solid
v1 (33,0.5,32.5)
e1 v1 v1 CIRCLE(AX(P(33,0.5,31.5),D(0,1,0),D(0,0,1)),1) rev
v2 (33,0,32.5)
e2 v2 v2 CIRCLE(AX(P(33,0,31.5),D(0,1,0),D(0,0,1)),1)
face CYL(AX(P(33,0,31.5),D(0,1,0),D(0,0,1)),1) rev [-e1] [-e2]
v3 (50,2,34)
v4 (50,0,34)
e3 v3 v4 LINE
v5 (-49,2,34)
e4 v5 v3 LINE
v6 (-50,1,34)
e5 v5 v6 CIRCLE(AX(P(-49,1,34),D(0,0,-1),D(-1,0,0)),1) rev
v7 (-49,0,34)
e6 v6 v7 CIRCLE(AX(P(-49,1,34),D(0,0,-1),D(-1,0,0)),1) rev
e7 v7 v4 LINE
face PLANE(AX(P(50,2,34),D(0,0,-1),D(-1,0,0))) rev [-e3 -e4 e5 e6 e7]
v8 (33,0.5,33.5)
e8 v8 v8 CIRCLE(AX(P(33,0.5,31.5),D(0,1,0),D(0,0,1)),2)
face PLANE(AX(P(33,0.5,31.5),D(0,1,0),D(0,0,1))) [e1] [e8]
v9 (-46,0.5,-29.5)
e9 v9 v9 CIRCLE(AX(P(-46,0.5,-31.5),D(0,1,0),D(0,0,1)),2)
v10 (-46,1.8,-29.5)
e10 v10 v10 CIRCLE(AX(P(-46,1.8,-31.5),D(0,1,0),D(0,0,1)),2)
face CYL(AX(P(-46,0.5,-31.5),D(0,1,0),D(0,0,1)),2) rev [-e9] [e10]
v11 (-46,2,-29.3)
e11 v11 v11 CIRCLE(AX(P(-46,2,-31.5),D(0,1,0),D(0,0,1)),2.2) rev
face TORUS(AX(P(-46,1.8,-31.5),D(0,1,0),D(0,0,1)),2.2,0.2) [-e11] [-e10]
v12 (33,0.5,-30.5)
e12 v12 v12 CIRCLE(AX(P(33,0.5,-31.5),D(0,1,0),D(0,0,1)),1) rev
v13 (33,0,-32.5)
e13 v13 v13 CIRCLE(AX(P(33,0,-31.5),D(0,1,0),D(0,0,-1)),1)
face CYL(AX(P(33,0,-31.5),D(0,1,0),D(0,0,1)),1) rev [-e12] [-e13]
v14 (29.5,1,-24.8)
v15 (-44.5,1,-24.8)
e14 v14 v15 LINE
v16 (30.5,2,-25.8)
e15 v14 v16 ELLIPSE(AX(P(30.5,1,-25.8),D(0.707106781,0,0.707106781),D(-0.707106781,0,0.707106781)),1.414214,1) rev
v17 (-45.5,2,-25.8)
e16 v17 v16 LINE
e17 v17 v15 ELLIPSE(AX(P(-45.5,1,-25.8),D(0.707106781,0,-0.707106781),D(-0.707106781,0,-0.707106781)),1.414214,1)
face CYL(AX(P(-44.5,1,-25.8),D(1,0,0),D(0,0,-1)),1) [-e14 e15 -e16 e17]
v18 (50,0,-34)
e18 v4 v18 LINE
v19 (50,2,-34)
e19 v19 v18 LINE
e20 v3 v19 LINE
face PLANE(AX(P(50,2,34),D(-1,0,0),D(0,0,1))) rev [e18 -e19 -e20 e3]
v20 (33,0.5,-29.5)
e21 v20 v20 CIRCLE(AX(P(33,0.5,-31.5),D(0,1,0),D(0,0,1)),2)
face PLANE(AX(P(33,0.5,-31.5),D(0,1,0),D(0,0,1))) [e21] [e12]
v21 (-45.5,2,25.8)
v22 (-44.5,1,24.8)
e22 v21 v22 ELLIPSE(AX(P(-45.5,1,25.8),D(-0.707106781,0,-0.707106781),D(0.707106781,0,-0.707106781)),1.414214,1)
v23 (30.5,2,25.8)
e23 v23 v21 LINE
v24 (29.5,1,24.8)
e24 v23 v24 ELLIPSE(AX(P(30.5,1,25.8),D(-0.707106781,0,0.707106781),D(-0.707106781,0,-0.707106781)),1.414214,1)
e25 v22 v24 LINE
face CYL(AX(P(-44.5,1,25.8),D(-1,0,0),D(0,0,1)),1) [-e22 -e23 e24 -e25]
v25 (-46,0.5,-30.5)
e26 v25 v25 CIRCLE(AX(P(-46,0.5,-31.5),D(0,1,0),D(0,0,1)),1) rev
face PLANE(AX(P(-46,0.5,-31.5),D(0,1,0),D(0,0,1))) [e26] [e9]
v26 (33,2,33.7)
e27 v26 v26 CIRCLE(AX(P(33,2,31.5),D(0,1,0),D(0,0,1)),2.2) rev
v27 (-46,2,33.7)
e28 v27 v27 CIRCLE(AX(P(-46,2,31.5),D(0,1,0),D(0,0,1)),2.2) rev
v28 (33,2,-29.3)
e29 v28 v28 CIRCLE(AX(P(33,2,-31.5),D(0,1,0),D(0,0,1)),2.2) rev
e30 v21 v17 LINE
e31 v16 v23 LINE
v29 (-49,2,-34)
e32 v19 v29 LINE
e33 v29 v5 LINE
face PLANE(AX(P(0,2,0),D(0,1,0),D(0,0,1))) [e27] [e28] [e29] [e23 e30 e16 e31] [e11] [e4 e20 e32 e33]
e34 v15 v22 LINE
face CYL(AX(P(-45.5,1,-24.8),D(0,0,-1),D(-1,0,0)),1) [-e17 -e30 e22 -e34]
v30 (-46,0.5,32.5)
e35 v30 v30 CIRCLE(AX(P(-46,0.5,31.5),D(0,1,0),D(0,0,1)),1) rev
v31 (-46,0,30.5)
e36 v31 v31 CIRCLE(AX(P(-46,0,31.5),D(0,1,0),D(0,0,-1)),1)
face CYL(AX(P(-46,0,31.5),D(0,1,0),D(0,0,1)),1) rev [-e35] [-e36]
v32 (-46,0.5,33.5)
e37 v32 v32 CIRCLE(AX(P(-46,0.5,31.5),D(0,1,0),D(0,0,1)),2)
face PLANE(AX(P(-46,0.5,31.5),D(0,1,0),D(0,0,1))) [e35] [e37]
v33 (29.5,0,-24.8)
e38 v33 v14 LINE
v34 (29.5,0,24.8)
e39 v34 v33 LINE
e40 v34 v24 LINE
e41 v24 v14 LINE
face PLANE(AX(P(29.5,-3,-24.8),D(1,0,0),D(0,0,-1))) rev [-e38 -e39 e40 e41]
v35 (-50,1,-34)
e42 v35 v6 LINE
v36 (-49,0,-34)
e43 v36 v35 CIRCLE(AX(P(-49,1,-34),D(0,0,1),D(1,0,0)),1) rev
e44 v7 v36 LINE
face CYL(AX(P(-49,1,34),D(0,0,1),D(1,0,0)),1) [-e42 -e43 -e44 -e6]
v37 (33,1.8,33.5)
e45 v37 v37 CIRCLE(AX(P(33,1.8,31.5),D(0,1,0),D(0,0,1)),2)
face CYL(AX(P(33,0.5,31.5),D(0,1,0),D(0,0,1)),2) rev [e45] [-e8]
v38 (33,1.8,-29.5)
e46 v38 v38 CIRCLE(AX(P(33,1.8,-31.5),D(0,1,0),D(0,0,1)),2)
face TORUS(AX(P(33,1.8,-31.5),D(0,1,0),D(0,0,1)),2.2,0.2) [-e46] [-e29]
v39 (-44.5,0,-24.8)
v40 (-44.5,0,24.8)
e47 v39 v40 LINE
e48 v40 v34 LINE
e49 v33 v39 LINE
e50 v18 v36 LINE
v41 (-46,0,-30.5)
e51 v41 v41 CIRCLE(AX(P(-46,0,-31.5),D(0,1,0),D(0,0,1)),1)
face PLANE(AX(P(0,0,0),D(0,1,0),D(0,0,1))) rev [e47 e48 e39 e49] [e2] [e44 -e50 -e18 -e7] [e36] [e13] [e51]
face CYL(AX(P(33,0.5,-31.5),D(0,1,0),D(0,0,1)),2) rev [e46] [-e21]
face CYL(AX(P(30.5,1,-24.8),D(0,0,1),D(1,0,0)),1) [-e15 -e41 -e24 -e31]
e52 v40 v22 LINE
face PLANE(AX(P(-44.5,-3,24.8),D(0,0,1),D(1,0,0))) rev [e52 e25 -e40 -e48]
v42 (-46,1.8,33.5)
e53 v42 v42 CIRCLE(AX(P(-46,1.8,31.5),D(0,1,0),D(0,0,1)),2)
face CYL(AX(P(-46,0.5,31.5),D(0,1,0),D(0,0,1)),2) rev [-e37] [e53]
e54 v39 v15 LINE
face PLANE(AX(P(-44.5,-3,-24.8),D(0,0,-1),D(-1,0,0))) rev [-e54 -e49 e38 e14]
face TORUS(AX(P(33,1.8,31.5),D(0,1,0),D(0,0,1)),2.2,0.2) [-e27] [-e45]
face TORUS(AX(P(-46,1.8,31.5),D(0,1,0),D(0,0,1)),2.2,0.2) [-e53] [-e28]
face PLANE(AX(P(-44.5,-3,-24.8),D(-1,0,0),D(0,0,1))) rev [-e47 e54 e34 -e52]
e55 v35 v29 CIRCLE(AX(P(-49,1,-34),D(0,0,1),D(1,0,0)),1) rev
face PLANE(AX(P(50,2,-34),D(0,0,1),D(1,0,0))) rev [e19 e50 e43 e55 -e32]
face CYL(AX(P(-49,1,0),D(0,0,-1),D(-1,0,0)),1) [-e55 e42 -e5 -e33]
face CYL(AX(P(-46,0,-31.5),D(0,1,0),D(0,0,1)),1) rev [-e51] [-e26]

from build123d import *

# Parameters (mm, degrees)
SKETCH_1_W          = 100
SKETCH_1_H          = 68
EXTRUDE_1_DEPTH     = 2
SKETCH_2_R          = 1
CUT_EXTRUDE_1_DEPTH = 2
SKETCH_3_R          = 2
CUT_EXTRUDE_2_DEPTH = 1.5
SKETCH_4_W          = 74
SKETCH_4_H          = 49.6
CUT_EXTRUDE_3_DEPTH = 5
FILLET_1_R          = 1
FILLET_2_R          = 1
FILLET_3_R          = 0.2


with BuildPart() as part:
    # Эскиз1 → Бобышка-Вытянуть1 (new body)
    with BuildSketch(Plane(origin=(0, 0, 0), x_dir=(1, 0, 0), z_dir=(0, 1, 0))):
        Rectangle(SKETCH_1_W, SKETCH_1_H)
    extrude(amount=EXTRUDE_1_DEPTH)

    # Эскиз2 → Вырез-Вытянуть1 (cut)
    with BuildSketch(Plane(origin=(0, 2, 0), x_dir=(1, 0, 0), z_dir=(0, 1, 0))):
        with Locations(Location((-46, 31.5, 0), (0, 0, 270))):
            Circle(SKETCH_2_R)
        with Locations(Location((33, 31.5, 0), (0, 0, 90))):
            Circle(SKETCH_2_R)
        with Locations(Location((33, -31.5, 0), (0, 0, 270))):
            Circle(SKETCH_2_R)
        with Locations(Location((-46, -31.5, 0), (0, 0, 90))):
            Circle(SKETCH_2_R)
    extrude(amount=-CUT_EXTRUDE_1_DEPTH, mode=Mode.SUBTRACT)

    # Эскиз3 → Вырез-Вытянуть2 (cut)
    with BuildSketch(Plane(origin=(0, 2, 0), x_dir=(1, 0, 0), z_dir=(0, 1, 0))):
        with Locations(Location((-46, 31.5, 0), (0, 0, 270))):
            Circle(SKETCH_3_R)
        with Locations(Location((-46, -31.5, 0), (0, 0, 270))):
            Circle(SKETCH_3_R)
        with Locations(Location((33, -31.5, 0), (0, 0, 270))):
            Circle(SKETCH_3_R)
        with Locations(Location((33, 31.5, 0), (0, 0, 270))):
            Circle(SKETCH_3_R)
    extrude(amount=-CUT_EXTRUDE_2_DEPTH, mode=Mode.SUBTRACT)

    # Эскиз4 → Вырез-Вытянуть3 (cut)
    with BuildSketch(Plane(origin=(0, 2, 0), x_dir=(1, 0, 0), z_dir=(0, 1, 0))):
        with Locations((-7.5, 0)):
            Rectangle(SKETCH_4_W, SKETCH_4_H)
    extrude(amount=-CUT_EXTRUDE_3_DEPTH, mode=Mode.SUBTRACT)

    # Скругление1
    fillet_1_edges = [part.edges().sort_by_distance(p)[0] for p in [
        (-7.5, 2, -24.8),
        (-50, 2, 0),
        (-50, 0, 0),
    ]]
    fillet(fillet_1_edges, radius=FILLET_1_R - 0.0001)  # a hair under: the kernel refuses the full size

    # Скругление2
    fillet_2_edges = [part.edges().sort_by_distance(p)[0] for p in [
        (-44.5, 2, -0.49995),
        (-7.5, 2, 24.8),
        (29.5, 2, -0.49995),
    ]]
    fillet(fillet_2_edges, radius=FILLET_2_R - 0.0001)  # a hair under: the kernel refuses the full size

    # Скругление3
    fillet_3_edges = [part.edges().sort_by_distance(p)[0] for p in [
        (-46, 2, -33.5),
        (-46, 2, 29.5),
        (33, 2, 29.5),
        (33, 2, -33.5),
    ]]
    fillet(fillet_3_edges, radius=FILLET_3_R)


solid = part.part
